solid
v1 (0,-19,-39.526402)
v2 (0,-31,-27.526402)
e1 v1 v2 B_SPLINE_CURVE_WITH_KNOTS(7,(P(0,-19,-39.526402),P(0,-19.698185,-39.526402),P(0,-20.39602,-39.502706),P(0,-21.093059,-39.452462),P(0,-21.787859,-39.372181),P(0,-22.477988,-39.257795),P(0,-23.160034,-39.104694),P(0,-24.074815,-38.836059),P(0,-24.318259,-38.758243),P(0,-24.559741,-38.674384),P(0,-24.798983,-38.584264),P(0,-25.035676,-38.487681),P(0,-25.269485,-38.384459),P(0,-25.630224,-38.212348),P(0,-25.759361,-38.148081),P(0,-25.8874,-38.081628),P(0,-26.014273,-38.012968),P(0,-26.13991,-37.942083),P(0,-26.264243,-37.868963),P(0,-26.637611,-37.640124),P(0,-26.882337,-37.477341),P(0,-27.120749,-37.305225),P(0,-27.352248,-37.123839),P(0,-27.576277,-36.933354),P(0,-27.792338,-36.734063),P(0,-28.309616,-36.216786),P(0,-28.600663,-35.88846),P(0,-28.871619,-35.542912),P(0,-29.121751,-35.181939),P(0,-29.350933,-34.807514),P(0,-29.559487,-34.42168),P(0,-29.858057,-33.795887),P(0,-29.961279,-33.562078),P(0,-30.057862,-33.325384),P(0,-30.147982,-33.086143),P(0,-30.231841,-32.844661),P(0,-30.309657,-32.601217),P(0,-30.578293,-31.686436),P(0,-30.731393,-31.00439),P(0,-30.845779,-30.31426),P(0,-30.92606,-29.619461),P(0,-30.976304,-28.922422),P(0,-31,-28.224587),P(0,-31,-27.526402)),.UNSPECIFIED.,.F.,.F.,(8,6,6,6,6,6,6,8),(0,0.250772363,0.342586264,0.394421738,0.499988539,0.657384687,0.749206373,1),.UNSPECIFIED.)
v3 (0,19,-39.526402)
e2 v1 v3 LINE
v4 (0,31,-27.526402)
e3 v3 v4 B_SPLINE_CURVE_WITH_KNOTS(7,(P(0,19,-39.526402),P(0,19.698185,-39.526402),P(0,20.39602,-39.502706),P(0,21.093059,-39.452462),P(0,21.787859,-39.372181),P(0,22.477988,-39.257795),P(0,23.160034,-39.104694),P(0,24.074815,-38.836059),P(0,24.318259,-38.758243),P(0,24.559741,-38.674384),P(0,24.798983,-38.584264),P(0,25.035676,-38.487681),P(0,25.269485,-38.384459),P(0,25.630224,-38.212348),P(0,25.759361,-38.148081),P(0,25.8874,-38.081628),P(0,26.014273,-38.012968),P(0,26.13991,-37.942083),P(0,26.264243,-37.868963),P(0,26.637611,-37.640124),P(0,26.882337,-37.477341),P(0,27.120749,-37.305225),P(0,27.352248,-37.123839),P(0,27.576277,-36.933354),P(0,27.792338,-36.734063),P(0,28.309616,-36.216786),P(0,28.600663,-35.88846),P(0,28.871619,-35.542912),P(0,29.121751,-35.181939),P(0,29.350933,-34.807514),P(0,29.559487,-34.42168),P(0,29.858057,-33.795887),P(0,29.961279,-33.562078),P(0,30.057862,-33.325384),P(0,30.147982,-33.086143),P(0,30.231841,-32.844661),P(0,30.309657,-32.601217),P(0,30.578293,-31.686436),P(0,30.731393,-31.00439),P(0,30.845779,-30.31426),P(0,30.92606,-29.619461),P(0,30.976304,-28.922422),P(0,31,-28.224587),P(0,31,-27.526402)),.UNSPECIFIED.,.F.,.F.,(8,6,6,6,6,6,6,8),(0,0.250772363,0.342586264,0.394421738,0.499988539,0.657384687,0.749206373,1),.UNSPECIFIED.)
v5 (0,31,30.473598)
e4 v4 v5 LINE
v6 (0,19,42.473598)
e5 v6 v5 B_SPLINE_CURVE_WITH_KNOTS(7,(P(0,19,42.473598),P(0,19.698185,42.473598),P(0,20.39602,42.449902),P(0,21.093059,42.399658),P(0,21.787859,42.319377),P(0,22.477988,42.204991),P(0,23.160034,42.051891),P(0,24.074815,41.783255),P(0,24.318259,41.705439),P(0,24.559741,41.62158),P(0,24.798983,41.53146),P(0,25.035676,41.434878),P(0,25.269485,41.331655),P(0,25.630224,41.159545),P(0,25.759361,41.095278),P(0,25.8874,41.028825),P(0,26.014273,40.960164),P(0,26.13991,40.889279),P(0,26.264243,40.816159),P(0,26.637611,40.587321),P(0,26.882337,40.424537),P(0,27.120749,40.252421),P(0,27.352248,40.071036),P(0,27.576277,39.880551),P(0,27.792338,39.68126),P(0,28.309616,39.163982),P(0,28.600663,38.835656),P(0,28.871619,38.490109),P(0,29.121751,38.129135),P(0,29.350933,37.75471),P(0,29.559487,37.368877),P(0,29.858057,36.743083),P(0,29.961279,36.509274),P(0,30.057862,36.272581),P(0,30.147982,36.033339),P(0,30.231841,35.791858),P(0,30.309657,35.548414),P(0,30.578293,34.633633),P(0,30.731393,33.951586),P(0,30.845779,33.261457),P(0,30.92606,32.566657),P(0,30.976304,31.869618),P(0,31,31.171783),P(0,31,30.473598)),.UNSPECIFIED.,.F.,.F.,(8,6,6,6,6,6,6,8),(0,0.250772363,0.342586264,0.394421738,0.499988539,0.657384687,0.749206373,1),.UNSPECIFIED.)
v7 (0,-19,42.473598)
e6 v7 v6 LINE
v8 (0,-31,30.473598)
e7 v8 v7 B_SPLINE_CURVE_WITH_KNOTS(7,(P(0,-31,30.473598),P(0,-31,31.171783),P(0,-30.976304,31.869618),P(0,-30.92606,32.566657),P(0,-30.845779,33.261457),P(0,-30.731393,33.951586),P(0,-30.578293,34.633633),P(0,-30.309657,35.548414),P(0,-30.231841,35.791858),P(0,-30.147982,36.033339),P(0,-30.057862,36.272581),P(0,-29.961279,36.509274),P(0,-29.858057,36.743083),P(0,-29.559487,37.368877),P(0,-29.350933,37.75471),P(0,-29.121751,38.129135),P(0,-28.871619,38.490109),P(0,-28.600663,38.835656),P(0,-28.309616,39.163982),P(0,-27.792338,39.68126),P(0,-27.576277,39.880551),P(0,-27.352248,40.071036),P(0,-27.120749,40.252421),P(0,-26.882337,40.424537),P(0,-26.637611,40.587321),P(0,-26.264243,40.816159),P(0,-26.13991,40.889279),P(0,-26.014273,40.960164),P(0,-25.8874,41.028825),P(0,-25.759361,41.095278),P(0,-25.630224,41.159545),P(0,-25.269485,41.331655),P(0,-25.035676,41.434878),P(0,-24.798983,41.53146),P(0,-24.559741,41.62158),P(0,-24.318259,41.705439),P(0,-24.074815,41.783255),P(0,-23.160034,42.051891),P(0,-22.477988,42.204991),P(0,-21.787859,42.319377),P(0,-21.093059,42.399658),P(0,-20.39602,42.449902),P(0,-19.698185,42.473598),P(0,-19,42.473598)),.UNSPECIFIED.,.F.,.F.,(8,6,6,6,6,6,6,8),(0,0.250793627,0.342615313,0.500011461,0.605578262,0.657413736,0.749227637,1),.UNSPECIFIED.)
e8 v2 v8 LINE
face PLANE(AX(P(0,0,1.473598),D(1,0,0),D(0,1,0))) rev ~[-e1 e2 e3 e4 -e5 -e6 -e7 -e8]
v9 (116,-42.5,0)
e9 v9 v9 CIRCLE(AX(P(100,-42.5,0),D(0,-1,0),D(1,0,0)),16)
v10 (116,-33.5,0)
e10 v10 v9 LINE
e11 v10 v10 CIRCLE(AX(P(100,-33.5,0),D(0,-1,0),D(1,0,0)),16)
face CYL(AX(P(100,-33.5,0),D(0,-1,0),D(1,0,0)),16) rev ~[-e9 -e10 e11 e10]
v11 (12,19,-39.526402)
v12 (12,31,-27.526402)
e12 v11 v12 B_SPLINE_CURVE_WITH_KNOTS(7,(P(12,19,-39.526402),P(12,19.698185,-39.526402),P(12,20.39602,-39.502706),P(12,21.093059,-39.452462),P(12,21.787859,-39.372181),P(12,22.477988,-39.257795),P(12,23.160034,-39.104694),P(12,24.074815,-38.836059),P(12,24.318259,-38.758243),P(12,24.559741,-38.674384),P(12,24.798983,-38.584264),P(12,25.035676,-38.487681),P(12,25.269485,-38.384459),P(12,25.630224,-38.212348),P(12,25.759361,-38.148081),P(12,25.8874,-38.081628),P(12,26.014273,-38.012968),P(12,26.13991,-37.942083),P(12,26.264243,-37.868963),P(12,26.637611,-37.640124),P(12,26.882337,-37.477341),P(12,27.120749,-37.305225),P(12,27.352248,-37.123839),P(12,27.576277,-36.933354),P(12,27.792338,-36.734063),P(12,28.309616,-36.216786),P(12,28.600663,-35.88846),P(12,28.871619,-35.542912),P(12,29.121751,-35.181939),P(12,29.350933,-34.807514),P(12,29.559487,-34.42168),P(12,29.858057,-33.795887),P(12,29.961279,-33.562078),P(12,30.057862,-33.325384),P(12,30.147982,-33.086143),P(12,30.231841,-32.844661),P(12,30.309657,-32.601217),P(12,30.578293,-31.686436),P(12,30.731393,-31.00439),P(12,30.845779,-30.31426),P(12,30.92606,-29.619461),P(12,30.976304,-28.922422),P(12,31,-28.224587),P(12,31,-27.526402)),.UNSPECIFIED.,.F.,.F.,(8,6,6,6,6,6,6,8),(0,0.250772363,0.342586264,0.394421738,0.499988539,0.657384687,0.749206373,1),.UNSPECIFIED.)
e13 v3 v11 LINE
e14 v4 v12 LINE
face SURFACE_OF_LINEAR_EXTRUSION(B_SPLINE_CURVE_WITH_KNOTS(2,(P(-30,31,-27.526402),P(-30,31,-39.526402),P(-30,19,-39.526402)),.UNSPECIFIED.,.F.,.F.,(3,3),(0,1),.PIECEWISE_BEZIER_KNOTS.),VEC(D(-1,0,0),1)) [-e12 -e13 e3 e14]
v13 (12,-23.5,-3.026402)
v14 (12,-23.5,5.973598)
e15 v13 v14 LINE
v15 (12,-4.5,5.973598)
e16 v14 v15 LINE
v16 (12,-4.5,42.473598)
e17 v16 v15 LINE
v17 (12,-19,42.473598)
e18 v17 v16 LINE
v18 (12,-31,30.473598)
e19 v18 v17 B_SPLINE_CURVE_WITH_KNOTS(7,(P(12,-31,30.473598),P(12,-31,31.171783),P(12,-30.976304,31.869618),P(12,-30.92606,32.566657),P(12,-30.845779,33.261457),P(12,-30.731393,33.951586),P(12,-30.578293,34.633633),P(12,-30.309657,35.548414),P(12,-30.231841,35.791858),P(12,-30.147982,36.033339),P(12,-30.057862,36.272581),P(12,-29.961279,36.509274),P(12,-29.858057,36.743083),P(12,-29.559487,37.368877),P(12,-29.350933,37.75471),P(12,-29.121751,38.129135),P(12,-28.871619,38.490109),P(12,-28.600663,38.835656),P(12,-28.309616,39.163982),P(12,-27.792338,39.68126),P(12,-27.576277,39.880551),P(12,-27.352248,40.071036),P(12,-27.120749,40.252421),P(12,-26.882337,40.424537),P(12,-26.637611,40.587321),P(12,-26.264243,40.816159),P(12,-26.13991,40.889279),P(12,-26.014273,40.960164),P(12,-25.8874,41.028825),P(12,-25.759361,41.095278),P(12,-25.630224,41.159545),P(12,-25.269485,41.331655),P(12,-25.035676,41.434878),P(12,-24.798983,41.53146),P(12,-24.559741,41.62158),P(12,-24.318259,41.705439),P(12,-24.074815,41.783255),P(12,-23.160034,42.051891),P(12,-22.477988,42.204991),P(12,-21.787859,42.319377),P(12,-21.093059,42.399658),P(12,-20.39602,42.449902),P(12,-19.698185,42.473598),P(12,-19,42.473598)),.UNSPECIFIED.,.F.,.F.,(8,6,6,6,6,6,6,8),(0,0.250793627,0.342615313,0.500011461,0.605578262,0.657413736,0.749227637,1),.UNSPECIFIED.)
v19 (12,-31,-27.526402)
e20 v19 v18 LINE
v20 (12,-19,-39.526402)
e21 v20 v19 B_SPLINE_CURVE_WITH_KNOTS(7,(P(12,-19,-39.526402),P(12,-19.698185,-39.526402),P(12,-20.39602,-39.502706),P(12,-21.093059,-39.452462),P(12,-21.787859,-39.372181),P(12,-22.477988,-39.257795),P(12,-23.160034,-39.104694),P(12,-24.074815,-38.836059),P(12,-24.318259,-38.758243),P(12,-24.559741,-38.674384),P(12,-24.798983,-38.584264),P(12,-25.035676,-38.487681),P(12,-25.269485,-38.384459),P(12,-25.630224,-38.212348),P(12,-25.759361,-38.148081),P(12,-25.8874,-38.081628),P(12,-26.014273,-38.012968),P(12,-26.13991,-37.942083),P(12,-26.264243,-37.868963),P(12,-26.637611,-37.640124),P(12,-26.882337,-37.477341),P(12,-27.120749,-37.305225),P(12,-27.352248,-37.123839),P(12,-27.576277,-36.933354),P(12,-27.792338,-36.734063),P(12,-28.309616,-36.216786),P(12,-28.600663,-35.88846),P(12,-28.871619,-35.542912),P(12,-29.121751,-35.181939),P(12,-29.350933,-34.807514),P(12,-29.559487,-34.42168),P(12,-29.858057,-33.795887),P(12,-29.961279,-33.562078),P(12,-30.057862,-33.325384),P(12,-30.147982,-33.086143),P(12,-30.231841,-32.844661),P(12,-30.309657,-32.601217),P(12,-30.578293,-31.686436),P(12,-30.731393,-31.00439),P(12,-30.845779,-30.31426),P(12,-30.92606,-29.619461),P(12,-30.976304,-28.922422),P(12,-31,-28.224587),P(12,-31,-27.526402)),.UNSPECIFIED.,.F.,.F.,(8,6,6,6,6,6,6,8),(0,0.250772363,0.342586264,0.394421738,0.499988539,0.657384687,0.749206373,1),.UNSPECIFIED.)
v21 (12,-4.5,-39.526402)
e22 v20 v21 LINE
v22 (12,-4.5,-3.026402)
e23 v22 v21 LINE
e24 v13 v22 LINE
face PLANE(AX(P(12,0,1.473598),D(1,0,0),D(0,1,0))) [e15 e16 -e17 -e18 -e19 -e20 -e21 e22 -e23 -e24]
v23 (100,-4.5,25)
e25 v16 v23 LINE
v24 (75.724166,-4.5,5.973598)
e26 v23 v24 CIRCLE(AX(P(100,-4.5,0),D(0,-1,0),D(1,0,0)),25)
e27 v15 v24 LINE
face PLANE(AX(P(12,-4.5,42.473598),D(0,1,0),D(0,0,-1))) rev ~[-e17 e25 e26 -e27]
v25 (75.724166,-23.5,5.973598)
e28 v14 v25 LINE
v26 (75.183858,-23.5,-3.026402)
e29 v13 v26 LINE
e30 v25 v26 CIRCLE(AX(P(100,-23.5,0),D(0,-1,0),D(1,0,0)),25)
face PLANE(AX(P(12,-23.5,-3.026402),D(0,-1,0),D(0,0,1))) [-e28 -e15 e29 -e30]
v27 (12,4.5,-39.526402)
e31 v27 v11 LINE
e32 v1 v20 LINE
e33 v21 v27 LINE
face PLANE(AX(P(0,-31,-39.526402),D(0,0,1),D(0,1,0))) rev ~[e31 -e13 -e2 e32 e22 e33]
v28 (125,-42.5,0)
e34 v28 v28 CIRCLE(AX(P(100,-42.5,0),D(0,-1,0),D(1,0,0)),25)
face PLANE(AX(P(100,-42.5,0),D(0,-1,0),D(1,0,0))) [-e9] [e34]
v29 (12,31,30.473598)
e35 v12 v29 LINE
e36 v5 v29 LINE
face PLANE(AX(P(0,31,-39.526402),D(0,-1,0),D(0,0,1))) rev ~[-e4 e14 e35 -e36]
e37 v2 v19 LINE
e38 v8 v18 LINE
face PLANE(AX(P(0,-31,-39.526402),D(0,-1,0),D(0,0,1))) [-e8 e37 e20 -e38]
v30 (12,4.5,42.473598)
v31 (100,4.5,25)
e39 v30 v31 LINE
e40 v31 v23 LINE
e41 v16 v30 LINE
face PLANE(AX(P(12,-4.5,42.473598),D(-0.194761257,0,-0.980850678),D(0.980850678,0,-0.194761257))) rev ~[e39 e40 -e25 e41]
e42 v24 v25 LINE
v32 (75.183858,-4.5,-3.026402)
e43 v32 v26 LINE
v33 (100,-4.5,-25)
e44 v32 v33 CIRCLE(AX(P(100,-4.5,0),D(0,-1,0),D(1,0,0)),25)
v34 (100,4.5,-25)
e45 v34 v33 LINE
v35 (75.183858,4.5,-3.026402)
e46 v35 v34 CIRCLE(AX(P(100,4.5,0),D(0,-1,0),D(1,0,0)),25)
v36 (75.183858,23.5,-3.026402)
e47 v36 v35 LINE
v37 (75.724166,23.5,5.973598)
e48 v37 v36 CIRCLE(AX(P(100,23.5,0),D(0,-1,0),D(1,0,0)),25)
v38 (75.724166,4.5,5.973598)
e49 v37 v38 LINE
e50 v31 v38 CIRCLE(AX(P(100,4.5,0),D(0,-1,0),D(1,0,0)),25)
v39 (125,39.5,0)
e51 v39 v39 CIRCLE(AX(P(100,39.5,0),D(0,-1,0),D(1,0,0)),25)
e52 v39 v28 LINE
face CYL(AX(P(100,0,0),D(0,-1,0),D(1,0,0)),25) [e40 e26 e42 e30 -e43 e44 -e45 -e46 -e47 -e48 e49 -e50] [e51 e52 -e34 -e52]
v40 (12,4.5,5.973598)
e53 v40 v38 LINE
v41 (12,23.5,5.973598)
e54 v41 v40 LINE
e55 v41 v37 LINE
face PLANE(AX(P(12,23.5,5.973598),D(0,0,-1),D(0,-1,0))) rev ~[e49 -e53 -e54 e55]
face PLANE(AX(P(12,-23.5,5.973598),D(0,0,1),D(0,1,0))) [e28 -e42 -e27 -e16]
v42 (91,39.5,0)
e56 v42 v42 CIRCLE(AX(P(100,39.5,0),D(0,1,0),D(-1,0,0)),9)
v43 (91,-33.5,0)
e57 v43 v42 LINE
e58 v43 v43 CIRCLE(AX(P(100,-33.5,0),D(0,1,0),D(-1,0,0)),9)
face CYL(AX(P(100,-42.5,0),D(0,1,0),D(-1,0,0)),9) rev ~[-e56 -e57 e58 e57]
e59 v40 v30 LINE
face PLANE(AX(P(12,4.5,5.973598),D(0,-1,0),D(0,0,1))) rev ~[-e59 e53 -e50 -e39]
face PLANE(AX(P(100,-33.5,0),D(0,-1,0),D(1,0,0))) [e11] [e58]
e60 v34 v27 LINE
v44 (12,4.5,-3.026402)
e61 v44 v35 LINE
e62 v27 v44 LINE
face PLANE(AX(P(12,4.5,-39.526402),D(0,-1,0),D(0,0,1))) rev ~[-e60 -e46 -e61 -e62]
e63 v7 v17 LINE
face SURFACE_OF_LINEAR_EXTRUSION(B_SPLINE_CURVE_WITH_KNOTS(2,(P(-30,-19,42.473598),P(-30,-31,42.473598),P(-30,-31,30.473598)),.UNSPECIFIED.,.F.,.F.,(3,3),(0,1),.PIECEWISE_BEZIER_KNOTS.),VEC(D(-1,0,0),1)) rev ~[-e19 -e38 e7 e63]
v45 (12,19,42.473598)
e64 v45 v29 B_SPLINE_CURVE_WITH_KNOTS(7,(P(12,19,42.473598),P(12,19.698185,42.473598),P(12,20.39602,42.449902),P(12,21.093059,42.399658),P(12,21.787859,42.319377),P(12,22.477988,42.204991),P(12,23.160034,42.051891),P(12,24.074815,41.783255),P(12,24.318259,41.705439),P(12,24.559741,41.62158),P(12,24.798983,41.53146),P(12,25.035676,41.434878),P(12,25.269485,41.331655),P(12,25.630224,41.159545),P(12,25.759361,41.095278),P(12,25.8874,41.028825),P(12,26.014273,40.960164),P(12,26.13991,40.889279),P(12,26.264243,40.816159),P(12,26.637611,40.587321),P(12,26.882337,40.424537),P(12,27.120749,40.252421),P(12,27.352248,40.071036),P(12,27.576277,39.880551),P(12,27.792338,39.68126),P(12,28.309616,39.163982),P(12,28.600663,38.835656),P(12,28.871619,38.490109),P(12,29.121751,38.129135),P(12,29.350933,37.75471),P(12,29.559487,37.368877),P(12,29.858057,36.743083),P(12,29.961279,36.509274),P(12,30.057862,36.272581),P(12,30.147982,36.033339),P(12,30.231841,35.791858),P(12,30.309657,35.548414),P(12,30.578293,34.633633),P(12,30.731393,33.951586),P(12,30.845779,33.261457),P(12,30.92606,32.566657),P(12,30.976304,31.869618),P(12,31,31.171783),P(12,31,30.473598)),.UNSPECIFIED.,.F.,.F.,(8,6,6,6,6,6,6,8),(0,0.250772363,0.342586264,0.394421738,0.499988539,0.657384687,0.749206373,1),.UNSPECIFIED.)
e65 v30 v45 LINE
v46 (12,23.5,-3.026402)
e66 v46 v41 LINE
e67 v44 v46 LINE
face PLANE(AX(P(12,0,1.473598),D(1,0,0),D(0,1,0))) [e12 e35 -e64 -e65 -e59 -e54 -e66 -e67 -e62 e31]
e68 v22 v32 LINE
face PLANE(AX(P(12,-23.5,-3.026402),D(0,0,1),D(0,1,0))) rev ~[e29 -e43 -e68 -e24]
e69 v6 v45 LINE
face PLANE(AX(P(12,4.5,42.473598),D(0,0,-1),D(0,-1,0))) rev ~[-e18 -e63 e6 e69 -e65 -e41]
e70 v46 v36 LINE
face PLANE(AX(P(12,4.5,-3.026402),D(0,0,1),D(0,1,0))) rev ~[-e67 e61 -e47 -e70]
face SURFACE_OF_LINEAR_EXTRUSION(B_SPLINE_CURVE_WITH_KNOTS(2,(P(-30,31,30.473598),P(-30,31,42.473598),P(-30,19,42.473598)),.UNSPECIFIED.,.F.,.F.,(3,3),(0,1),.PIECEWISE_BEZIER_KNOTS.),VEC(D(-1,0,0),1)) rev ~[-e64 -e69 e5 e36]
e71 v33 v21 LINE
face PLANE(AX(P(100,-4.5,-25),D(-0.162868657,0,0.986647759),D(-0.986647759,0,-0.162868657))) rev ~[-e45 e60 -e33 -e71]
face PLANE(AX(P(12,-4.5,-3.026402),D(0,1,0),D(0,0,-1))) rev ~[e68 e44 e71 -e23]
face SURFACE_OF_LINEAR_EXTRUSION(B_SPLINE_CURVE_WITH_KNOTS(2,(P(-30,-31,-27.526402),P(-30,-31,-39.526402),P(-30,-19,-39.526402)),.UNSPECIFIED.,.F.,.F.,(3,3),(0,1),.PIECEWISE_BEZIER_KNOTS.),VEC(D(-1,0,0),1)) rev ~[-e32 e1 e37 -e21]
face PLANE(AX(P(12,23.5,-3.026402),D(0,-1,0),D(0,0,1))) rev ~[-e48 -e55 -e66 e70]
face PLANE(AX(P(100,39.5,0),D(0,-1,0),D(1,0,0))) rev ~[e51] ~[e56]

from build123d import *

# Parameters (mm, degrees)
F0_W            = 62
F0_H            = 82
F1_DEPTH        = 12
F2_T1_DEPTH     = 72
F4_R            = 25
F5_DEPTH        = 42.5
F5_DEPTH_BACK   = 39.5
F3_W            = 19
F3_H            = 9
F6_DEPTH        = 88
F8_DEPTH        = 25
F10_DEPTH       = 25
F12_D           = 18
F12_DEPTH       = 90
F12_CBORE_D     = 32
F12_CBORE_DEPTH = 9
F12_TIP         = 5.4077455712


# Not quite as in the source:
# - a fillet or chamfer that OpenCascade refuses, or shapes differently, is made with other operations: its cross-section is extruded or revolved along the edge and cut away or added


with BuildPart() as f1:
    # F0 (on Right) → F1 (new body)
    with BuildSketch(Plane.YZ):
        with Locations((0, 1.4735981822)):
            Rectangle(F0_W, F0_H)
    extrude(amount=F1_DEPTH)

    # F2: fillet of radius 12 on 4 edges, made by hand

    # F2_s2 → F2_t1 (cut)
    with BuildSketch(Plane.YZ.offset(-30)):
        with BuildLine():
            add(Edge.make_bspline(
                [(-19, 42.4735981822), (-31, 42.4735981822), (-31, 30.4735981822)],
                knots=[0, 0, 0, 1, 1, 1], degree=2, weights=[1, 1, 1]))
            Line((-31, 30.4735981822), (-31, 42.4735981822))
            Line((-31, 42.4735981822), (-19, 42.4735981822))
        make_face()
        with BuildLine():
            add(Edge.make_bspline(
                [(31, 30.4735981822), (31, 42.4735981822), (19, 42.4735981822)],
                knots=[0, 0, 0, 1, 1, 1], degree=2, weights=[1, 1, 1]))
            Line((19, 42.4735981822), (31, 42.4735981822))
            Line((31, 42.4735981822), (31, 30.4735981822))
        make_face()
        with BuildLine():
            add(Edge.make_bspline(
                [(-31, -27.5264018178), (-31, -39.5264018178), (-19, -39.5264018178)],
                knots=[0, 0, 0, 1, 1, 1], degree=2, weights=[1, 1, 1]))
            Line((-19, -39.5264018178), (-31, -39.5264018178))
            Line((-31, -39.5264018178), (-31, -27.5264018178))
        make_face()
        with BuildLine():
            add(Edge.make_bspline(
                [(31, -27.5264018178), (31, -39.5264018178), (19, -39.5264018178)],
                knots=[0, 0, 0, 1, 1, 1], degree=2, weights=[1, 1, 1]))
            Line((19, -39.5264018178), (31, -39.5264018178))
            Line((31, -39.5264018178), (31, -27.5264018178))
        make_face()
    extrude(amount=F2_T1_DEPTH, mode=Mode.SUBTRACT)



with BuildPart() as f5:
    # F4 (on Front) → F5 (new body, two sides)
    with BuildSketch(Plane.XZ) as f5_sk:
        with Locations((100, 0)):
            Circle(F4_R)
    extrude(amount=F5_DEPTH)
    extrude(f5_sk.sketch, amount=-F5_DEPTH_BACK)


with BuildPart() as f1_1:
    add(f1.part)

    add(f5.part)  # F6 merges F5
    # F3 (on face) → F6 (join)
    with BuildSketch(Plane.YZ.offset(12)):
        Polygon((4.5, 5.9735981822), (4.5, 42.4735981822), (-4.5, 42.4735981822), (-4.5, 5.9735981822), (-4.5, -3.0264018178), (-4.5, -39.5264018178), (4.5, -39.5264018178), (4.5, -3.0264018178), (23.5, -3.0264018178), (23.5, 5.9735981822), align=None)
        with Locations((-14, 1.4735981822)):
            Rectangle(F3_W, F3_H)
    extrude(amount=F6_DEPTH)

    # F7 (on face) → F8 (cut)
    with BuildSketch(Plane.XZ.offset(4.5)):
        Polygon((100, 42.4735981822), (12, 42.4735981822), (100, 25), align=None)
    extrude(amount=-F8_DEPTH, mode=Mode.SUBTRACT)

    # F9 (on face) → F10 (cut)
    with BuildSketch(Plane.XZ.offset(4.5)):
        Polygon((100, -39.5264018178), (100, -25), (12, -39.5264018178), align=None)
    extrude(amount=-F10_DEPTH, mode=Mode.SUBTRACT)

    # F12
    with Locations(Plane.XZ.offset(42.5)):
        with Locations((100, 0)):
            CounterBoreHole(F12_D / 2, F12_CBORE_D / 2, F12_CBORE_DEPTH, depth=F12_DEPTH)
            with Locations((0, 0, -(F12_DEPTH + F12_TIP / 2))):  # 118° drill point
                Cone(0, F12_D / 2, F12_TIP, mode=Mode.SUBTRACT)


solid = f1_1.part
